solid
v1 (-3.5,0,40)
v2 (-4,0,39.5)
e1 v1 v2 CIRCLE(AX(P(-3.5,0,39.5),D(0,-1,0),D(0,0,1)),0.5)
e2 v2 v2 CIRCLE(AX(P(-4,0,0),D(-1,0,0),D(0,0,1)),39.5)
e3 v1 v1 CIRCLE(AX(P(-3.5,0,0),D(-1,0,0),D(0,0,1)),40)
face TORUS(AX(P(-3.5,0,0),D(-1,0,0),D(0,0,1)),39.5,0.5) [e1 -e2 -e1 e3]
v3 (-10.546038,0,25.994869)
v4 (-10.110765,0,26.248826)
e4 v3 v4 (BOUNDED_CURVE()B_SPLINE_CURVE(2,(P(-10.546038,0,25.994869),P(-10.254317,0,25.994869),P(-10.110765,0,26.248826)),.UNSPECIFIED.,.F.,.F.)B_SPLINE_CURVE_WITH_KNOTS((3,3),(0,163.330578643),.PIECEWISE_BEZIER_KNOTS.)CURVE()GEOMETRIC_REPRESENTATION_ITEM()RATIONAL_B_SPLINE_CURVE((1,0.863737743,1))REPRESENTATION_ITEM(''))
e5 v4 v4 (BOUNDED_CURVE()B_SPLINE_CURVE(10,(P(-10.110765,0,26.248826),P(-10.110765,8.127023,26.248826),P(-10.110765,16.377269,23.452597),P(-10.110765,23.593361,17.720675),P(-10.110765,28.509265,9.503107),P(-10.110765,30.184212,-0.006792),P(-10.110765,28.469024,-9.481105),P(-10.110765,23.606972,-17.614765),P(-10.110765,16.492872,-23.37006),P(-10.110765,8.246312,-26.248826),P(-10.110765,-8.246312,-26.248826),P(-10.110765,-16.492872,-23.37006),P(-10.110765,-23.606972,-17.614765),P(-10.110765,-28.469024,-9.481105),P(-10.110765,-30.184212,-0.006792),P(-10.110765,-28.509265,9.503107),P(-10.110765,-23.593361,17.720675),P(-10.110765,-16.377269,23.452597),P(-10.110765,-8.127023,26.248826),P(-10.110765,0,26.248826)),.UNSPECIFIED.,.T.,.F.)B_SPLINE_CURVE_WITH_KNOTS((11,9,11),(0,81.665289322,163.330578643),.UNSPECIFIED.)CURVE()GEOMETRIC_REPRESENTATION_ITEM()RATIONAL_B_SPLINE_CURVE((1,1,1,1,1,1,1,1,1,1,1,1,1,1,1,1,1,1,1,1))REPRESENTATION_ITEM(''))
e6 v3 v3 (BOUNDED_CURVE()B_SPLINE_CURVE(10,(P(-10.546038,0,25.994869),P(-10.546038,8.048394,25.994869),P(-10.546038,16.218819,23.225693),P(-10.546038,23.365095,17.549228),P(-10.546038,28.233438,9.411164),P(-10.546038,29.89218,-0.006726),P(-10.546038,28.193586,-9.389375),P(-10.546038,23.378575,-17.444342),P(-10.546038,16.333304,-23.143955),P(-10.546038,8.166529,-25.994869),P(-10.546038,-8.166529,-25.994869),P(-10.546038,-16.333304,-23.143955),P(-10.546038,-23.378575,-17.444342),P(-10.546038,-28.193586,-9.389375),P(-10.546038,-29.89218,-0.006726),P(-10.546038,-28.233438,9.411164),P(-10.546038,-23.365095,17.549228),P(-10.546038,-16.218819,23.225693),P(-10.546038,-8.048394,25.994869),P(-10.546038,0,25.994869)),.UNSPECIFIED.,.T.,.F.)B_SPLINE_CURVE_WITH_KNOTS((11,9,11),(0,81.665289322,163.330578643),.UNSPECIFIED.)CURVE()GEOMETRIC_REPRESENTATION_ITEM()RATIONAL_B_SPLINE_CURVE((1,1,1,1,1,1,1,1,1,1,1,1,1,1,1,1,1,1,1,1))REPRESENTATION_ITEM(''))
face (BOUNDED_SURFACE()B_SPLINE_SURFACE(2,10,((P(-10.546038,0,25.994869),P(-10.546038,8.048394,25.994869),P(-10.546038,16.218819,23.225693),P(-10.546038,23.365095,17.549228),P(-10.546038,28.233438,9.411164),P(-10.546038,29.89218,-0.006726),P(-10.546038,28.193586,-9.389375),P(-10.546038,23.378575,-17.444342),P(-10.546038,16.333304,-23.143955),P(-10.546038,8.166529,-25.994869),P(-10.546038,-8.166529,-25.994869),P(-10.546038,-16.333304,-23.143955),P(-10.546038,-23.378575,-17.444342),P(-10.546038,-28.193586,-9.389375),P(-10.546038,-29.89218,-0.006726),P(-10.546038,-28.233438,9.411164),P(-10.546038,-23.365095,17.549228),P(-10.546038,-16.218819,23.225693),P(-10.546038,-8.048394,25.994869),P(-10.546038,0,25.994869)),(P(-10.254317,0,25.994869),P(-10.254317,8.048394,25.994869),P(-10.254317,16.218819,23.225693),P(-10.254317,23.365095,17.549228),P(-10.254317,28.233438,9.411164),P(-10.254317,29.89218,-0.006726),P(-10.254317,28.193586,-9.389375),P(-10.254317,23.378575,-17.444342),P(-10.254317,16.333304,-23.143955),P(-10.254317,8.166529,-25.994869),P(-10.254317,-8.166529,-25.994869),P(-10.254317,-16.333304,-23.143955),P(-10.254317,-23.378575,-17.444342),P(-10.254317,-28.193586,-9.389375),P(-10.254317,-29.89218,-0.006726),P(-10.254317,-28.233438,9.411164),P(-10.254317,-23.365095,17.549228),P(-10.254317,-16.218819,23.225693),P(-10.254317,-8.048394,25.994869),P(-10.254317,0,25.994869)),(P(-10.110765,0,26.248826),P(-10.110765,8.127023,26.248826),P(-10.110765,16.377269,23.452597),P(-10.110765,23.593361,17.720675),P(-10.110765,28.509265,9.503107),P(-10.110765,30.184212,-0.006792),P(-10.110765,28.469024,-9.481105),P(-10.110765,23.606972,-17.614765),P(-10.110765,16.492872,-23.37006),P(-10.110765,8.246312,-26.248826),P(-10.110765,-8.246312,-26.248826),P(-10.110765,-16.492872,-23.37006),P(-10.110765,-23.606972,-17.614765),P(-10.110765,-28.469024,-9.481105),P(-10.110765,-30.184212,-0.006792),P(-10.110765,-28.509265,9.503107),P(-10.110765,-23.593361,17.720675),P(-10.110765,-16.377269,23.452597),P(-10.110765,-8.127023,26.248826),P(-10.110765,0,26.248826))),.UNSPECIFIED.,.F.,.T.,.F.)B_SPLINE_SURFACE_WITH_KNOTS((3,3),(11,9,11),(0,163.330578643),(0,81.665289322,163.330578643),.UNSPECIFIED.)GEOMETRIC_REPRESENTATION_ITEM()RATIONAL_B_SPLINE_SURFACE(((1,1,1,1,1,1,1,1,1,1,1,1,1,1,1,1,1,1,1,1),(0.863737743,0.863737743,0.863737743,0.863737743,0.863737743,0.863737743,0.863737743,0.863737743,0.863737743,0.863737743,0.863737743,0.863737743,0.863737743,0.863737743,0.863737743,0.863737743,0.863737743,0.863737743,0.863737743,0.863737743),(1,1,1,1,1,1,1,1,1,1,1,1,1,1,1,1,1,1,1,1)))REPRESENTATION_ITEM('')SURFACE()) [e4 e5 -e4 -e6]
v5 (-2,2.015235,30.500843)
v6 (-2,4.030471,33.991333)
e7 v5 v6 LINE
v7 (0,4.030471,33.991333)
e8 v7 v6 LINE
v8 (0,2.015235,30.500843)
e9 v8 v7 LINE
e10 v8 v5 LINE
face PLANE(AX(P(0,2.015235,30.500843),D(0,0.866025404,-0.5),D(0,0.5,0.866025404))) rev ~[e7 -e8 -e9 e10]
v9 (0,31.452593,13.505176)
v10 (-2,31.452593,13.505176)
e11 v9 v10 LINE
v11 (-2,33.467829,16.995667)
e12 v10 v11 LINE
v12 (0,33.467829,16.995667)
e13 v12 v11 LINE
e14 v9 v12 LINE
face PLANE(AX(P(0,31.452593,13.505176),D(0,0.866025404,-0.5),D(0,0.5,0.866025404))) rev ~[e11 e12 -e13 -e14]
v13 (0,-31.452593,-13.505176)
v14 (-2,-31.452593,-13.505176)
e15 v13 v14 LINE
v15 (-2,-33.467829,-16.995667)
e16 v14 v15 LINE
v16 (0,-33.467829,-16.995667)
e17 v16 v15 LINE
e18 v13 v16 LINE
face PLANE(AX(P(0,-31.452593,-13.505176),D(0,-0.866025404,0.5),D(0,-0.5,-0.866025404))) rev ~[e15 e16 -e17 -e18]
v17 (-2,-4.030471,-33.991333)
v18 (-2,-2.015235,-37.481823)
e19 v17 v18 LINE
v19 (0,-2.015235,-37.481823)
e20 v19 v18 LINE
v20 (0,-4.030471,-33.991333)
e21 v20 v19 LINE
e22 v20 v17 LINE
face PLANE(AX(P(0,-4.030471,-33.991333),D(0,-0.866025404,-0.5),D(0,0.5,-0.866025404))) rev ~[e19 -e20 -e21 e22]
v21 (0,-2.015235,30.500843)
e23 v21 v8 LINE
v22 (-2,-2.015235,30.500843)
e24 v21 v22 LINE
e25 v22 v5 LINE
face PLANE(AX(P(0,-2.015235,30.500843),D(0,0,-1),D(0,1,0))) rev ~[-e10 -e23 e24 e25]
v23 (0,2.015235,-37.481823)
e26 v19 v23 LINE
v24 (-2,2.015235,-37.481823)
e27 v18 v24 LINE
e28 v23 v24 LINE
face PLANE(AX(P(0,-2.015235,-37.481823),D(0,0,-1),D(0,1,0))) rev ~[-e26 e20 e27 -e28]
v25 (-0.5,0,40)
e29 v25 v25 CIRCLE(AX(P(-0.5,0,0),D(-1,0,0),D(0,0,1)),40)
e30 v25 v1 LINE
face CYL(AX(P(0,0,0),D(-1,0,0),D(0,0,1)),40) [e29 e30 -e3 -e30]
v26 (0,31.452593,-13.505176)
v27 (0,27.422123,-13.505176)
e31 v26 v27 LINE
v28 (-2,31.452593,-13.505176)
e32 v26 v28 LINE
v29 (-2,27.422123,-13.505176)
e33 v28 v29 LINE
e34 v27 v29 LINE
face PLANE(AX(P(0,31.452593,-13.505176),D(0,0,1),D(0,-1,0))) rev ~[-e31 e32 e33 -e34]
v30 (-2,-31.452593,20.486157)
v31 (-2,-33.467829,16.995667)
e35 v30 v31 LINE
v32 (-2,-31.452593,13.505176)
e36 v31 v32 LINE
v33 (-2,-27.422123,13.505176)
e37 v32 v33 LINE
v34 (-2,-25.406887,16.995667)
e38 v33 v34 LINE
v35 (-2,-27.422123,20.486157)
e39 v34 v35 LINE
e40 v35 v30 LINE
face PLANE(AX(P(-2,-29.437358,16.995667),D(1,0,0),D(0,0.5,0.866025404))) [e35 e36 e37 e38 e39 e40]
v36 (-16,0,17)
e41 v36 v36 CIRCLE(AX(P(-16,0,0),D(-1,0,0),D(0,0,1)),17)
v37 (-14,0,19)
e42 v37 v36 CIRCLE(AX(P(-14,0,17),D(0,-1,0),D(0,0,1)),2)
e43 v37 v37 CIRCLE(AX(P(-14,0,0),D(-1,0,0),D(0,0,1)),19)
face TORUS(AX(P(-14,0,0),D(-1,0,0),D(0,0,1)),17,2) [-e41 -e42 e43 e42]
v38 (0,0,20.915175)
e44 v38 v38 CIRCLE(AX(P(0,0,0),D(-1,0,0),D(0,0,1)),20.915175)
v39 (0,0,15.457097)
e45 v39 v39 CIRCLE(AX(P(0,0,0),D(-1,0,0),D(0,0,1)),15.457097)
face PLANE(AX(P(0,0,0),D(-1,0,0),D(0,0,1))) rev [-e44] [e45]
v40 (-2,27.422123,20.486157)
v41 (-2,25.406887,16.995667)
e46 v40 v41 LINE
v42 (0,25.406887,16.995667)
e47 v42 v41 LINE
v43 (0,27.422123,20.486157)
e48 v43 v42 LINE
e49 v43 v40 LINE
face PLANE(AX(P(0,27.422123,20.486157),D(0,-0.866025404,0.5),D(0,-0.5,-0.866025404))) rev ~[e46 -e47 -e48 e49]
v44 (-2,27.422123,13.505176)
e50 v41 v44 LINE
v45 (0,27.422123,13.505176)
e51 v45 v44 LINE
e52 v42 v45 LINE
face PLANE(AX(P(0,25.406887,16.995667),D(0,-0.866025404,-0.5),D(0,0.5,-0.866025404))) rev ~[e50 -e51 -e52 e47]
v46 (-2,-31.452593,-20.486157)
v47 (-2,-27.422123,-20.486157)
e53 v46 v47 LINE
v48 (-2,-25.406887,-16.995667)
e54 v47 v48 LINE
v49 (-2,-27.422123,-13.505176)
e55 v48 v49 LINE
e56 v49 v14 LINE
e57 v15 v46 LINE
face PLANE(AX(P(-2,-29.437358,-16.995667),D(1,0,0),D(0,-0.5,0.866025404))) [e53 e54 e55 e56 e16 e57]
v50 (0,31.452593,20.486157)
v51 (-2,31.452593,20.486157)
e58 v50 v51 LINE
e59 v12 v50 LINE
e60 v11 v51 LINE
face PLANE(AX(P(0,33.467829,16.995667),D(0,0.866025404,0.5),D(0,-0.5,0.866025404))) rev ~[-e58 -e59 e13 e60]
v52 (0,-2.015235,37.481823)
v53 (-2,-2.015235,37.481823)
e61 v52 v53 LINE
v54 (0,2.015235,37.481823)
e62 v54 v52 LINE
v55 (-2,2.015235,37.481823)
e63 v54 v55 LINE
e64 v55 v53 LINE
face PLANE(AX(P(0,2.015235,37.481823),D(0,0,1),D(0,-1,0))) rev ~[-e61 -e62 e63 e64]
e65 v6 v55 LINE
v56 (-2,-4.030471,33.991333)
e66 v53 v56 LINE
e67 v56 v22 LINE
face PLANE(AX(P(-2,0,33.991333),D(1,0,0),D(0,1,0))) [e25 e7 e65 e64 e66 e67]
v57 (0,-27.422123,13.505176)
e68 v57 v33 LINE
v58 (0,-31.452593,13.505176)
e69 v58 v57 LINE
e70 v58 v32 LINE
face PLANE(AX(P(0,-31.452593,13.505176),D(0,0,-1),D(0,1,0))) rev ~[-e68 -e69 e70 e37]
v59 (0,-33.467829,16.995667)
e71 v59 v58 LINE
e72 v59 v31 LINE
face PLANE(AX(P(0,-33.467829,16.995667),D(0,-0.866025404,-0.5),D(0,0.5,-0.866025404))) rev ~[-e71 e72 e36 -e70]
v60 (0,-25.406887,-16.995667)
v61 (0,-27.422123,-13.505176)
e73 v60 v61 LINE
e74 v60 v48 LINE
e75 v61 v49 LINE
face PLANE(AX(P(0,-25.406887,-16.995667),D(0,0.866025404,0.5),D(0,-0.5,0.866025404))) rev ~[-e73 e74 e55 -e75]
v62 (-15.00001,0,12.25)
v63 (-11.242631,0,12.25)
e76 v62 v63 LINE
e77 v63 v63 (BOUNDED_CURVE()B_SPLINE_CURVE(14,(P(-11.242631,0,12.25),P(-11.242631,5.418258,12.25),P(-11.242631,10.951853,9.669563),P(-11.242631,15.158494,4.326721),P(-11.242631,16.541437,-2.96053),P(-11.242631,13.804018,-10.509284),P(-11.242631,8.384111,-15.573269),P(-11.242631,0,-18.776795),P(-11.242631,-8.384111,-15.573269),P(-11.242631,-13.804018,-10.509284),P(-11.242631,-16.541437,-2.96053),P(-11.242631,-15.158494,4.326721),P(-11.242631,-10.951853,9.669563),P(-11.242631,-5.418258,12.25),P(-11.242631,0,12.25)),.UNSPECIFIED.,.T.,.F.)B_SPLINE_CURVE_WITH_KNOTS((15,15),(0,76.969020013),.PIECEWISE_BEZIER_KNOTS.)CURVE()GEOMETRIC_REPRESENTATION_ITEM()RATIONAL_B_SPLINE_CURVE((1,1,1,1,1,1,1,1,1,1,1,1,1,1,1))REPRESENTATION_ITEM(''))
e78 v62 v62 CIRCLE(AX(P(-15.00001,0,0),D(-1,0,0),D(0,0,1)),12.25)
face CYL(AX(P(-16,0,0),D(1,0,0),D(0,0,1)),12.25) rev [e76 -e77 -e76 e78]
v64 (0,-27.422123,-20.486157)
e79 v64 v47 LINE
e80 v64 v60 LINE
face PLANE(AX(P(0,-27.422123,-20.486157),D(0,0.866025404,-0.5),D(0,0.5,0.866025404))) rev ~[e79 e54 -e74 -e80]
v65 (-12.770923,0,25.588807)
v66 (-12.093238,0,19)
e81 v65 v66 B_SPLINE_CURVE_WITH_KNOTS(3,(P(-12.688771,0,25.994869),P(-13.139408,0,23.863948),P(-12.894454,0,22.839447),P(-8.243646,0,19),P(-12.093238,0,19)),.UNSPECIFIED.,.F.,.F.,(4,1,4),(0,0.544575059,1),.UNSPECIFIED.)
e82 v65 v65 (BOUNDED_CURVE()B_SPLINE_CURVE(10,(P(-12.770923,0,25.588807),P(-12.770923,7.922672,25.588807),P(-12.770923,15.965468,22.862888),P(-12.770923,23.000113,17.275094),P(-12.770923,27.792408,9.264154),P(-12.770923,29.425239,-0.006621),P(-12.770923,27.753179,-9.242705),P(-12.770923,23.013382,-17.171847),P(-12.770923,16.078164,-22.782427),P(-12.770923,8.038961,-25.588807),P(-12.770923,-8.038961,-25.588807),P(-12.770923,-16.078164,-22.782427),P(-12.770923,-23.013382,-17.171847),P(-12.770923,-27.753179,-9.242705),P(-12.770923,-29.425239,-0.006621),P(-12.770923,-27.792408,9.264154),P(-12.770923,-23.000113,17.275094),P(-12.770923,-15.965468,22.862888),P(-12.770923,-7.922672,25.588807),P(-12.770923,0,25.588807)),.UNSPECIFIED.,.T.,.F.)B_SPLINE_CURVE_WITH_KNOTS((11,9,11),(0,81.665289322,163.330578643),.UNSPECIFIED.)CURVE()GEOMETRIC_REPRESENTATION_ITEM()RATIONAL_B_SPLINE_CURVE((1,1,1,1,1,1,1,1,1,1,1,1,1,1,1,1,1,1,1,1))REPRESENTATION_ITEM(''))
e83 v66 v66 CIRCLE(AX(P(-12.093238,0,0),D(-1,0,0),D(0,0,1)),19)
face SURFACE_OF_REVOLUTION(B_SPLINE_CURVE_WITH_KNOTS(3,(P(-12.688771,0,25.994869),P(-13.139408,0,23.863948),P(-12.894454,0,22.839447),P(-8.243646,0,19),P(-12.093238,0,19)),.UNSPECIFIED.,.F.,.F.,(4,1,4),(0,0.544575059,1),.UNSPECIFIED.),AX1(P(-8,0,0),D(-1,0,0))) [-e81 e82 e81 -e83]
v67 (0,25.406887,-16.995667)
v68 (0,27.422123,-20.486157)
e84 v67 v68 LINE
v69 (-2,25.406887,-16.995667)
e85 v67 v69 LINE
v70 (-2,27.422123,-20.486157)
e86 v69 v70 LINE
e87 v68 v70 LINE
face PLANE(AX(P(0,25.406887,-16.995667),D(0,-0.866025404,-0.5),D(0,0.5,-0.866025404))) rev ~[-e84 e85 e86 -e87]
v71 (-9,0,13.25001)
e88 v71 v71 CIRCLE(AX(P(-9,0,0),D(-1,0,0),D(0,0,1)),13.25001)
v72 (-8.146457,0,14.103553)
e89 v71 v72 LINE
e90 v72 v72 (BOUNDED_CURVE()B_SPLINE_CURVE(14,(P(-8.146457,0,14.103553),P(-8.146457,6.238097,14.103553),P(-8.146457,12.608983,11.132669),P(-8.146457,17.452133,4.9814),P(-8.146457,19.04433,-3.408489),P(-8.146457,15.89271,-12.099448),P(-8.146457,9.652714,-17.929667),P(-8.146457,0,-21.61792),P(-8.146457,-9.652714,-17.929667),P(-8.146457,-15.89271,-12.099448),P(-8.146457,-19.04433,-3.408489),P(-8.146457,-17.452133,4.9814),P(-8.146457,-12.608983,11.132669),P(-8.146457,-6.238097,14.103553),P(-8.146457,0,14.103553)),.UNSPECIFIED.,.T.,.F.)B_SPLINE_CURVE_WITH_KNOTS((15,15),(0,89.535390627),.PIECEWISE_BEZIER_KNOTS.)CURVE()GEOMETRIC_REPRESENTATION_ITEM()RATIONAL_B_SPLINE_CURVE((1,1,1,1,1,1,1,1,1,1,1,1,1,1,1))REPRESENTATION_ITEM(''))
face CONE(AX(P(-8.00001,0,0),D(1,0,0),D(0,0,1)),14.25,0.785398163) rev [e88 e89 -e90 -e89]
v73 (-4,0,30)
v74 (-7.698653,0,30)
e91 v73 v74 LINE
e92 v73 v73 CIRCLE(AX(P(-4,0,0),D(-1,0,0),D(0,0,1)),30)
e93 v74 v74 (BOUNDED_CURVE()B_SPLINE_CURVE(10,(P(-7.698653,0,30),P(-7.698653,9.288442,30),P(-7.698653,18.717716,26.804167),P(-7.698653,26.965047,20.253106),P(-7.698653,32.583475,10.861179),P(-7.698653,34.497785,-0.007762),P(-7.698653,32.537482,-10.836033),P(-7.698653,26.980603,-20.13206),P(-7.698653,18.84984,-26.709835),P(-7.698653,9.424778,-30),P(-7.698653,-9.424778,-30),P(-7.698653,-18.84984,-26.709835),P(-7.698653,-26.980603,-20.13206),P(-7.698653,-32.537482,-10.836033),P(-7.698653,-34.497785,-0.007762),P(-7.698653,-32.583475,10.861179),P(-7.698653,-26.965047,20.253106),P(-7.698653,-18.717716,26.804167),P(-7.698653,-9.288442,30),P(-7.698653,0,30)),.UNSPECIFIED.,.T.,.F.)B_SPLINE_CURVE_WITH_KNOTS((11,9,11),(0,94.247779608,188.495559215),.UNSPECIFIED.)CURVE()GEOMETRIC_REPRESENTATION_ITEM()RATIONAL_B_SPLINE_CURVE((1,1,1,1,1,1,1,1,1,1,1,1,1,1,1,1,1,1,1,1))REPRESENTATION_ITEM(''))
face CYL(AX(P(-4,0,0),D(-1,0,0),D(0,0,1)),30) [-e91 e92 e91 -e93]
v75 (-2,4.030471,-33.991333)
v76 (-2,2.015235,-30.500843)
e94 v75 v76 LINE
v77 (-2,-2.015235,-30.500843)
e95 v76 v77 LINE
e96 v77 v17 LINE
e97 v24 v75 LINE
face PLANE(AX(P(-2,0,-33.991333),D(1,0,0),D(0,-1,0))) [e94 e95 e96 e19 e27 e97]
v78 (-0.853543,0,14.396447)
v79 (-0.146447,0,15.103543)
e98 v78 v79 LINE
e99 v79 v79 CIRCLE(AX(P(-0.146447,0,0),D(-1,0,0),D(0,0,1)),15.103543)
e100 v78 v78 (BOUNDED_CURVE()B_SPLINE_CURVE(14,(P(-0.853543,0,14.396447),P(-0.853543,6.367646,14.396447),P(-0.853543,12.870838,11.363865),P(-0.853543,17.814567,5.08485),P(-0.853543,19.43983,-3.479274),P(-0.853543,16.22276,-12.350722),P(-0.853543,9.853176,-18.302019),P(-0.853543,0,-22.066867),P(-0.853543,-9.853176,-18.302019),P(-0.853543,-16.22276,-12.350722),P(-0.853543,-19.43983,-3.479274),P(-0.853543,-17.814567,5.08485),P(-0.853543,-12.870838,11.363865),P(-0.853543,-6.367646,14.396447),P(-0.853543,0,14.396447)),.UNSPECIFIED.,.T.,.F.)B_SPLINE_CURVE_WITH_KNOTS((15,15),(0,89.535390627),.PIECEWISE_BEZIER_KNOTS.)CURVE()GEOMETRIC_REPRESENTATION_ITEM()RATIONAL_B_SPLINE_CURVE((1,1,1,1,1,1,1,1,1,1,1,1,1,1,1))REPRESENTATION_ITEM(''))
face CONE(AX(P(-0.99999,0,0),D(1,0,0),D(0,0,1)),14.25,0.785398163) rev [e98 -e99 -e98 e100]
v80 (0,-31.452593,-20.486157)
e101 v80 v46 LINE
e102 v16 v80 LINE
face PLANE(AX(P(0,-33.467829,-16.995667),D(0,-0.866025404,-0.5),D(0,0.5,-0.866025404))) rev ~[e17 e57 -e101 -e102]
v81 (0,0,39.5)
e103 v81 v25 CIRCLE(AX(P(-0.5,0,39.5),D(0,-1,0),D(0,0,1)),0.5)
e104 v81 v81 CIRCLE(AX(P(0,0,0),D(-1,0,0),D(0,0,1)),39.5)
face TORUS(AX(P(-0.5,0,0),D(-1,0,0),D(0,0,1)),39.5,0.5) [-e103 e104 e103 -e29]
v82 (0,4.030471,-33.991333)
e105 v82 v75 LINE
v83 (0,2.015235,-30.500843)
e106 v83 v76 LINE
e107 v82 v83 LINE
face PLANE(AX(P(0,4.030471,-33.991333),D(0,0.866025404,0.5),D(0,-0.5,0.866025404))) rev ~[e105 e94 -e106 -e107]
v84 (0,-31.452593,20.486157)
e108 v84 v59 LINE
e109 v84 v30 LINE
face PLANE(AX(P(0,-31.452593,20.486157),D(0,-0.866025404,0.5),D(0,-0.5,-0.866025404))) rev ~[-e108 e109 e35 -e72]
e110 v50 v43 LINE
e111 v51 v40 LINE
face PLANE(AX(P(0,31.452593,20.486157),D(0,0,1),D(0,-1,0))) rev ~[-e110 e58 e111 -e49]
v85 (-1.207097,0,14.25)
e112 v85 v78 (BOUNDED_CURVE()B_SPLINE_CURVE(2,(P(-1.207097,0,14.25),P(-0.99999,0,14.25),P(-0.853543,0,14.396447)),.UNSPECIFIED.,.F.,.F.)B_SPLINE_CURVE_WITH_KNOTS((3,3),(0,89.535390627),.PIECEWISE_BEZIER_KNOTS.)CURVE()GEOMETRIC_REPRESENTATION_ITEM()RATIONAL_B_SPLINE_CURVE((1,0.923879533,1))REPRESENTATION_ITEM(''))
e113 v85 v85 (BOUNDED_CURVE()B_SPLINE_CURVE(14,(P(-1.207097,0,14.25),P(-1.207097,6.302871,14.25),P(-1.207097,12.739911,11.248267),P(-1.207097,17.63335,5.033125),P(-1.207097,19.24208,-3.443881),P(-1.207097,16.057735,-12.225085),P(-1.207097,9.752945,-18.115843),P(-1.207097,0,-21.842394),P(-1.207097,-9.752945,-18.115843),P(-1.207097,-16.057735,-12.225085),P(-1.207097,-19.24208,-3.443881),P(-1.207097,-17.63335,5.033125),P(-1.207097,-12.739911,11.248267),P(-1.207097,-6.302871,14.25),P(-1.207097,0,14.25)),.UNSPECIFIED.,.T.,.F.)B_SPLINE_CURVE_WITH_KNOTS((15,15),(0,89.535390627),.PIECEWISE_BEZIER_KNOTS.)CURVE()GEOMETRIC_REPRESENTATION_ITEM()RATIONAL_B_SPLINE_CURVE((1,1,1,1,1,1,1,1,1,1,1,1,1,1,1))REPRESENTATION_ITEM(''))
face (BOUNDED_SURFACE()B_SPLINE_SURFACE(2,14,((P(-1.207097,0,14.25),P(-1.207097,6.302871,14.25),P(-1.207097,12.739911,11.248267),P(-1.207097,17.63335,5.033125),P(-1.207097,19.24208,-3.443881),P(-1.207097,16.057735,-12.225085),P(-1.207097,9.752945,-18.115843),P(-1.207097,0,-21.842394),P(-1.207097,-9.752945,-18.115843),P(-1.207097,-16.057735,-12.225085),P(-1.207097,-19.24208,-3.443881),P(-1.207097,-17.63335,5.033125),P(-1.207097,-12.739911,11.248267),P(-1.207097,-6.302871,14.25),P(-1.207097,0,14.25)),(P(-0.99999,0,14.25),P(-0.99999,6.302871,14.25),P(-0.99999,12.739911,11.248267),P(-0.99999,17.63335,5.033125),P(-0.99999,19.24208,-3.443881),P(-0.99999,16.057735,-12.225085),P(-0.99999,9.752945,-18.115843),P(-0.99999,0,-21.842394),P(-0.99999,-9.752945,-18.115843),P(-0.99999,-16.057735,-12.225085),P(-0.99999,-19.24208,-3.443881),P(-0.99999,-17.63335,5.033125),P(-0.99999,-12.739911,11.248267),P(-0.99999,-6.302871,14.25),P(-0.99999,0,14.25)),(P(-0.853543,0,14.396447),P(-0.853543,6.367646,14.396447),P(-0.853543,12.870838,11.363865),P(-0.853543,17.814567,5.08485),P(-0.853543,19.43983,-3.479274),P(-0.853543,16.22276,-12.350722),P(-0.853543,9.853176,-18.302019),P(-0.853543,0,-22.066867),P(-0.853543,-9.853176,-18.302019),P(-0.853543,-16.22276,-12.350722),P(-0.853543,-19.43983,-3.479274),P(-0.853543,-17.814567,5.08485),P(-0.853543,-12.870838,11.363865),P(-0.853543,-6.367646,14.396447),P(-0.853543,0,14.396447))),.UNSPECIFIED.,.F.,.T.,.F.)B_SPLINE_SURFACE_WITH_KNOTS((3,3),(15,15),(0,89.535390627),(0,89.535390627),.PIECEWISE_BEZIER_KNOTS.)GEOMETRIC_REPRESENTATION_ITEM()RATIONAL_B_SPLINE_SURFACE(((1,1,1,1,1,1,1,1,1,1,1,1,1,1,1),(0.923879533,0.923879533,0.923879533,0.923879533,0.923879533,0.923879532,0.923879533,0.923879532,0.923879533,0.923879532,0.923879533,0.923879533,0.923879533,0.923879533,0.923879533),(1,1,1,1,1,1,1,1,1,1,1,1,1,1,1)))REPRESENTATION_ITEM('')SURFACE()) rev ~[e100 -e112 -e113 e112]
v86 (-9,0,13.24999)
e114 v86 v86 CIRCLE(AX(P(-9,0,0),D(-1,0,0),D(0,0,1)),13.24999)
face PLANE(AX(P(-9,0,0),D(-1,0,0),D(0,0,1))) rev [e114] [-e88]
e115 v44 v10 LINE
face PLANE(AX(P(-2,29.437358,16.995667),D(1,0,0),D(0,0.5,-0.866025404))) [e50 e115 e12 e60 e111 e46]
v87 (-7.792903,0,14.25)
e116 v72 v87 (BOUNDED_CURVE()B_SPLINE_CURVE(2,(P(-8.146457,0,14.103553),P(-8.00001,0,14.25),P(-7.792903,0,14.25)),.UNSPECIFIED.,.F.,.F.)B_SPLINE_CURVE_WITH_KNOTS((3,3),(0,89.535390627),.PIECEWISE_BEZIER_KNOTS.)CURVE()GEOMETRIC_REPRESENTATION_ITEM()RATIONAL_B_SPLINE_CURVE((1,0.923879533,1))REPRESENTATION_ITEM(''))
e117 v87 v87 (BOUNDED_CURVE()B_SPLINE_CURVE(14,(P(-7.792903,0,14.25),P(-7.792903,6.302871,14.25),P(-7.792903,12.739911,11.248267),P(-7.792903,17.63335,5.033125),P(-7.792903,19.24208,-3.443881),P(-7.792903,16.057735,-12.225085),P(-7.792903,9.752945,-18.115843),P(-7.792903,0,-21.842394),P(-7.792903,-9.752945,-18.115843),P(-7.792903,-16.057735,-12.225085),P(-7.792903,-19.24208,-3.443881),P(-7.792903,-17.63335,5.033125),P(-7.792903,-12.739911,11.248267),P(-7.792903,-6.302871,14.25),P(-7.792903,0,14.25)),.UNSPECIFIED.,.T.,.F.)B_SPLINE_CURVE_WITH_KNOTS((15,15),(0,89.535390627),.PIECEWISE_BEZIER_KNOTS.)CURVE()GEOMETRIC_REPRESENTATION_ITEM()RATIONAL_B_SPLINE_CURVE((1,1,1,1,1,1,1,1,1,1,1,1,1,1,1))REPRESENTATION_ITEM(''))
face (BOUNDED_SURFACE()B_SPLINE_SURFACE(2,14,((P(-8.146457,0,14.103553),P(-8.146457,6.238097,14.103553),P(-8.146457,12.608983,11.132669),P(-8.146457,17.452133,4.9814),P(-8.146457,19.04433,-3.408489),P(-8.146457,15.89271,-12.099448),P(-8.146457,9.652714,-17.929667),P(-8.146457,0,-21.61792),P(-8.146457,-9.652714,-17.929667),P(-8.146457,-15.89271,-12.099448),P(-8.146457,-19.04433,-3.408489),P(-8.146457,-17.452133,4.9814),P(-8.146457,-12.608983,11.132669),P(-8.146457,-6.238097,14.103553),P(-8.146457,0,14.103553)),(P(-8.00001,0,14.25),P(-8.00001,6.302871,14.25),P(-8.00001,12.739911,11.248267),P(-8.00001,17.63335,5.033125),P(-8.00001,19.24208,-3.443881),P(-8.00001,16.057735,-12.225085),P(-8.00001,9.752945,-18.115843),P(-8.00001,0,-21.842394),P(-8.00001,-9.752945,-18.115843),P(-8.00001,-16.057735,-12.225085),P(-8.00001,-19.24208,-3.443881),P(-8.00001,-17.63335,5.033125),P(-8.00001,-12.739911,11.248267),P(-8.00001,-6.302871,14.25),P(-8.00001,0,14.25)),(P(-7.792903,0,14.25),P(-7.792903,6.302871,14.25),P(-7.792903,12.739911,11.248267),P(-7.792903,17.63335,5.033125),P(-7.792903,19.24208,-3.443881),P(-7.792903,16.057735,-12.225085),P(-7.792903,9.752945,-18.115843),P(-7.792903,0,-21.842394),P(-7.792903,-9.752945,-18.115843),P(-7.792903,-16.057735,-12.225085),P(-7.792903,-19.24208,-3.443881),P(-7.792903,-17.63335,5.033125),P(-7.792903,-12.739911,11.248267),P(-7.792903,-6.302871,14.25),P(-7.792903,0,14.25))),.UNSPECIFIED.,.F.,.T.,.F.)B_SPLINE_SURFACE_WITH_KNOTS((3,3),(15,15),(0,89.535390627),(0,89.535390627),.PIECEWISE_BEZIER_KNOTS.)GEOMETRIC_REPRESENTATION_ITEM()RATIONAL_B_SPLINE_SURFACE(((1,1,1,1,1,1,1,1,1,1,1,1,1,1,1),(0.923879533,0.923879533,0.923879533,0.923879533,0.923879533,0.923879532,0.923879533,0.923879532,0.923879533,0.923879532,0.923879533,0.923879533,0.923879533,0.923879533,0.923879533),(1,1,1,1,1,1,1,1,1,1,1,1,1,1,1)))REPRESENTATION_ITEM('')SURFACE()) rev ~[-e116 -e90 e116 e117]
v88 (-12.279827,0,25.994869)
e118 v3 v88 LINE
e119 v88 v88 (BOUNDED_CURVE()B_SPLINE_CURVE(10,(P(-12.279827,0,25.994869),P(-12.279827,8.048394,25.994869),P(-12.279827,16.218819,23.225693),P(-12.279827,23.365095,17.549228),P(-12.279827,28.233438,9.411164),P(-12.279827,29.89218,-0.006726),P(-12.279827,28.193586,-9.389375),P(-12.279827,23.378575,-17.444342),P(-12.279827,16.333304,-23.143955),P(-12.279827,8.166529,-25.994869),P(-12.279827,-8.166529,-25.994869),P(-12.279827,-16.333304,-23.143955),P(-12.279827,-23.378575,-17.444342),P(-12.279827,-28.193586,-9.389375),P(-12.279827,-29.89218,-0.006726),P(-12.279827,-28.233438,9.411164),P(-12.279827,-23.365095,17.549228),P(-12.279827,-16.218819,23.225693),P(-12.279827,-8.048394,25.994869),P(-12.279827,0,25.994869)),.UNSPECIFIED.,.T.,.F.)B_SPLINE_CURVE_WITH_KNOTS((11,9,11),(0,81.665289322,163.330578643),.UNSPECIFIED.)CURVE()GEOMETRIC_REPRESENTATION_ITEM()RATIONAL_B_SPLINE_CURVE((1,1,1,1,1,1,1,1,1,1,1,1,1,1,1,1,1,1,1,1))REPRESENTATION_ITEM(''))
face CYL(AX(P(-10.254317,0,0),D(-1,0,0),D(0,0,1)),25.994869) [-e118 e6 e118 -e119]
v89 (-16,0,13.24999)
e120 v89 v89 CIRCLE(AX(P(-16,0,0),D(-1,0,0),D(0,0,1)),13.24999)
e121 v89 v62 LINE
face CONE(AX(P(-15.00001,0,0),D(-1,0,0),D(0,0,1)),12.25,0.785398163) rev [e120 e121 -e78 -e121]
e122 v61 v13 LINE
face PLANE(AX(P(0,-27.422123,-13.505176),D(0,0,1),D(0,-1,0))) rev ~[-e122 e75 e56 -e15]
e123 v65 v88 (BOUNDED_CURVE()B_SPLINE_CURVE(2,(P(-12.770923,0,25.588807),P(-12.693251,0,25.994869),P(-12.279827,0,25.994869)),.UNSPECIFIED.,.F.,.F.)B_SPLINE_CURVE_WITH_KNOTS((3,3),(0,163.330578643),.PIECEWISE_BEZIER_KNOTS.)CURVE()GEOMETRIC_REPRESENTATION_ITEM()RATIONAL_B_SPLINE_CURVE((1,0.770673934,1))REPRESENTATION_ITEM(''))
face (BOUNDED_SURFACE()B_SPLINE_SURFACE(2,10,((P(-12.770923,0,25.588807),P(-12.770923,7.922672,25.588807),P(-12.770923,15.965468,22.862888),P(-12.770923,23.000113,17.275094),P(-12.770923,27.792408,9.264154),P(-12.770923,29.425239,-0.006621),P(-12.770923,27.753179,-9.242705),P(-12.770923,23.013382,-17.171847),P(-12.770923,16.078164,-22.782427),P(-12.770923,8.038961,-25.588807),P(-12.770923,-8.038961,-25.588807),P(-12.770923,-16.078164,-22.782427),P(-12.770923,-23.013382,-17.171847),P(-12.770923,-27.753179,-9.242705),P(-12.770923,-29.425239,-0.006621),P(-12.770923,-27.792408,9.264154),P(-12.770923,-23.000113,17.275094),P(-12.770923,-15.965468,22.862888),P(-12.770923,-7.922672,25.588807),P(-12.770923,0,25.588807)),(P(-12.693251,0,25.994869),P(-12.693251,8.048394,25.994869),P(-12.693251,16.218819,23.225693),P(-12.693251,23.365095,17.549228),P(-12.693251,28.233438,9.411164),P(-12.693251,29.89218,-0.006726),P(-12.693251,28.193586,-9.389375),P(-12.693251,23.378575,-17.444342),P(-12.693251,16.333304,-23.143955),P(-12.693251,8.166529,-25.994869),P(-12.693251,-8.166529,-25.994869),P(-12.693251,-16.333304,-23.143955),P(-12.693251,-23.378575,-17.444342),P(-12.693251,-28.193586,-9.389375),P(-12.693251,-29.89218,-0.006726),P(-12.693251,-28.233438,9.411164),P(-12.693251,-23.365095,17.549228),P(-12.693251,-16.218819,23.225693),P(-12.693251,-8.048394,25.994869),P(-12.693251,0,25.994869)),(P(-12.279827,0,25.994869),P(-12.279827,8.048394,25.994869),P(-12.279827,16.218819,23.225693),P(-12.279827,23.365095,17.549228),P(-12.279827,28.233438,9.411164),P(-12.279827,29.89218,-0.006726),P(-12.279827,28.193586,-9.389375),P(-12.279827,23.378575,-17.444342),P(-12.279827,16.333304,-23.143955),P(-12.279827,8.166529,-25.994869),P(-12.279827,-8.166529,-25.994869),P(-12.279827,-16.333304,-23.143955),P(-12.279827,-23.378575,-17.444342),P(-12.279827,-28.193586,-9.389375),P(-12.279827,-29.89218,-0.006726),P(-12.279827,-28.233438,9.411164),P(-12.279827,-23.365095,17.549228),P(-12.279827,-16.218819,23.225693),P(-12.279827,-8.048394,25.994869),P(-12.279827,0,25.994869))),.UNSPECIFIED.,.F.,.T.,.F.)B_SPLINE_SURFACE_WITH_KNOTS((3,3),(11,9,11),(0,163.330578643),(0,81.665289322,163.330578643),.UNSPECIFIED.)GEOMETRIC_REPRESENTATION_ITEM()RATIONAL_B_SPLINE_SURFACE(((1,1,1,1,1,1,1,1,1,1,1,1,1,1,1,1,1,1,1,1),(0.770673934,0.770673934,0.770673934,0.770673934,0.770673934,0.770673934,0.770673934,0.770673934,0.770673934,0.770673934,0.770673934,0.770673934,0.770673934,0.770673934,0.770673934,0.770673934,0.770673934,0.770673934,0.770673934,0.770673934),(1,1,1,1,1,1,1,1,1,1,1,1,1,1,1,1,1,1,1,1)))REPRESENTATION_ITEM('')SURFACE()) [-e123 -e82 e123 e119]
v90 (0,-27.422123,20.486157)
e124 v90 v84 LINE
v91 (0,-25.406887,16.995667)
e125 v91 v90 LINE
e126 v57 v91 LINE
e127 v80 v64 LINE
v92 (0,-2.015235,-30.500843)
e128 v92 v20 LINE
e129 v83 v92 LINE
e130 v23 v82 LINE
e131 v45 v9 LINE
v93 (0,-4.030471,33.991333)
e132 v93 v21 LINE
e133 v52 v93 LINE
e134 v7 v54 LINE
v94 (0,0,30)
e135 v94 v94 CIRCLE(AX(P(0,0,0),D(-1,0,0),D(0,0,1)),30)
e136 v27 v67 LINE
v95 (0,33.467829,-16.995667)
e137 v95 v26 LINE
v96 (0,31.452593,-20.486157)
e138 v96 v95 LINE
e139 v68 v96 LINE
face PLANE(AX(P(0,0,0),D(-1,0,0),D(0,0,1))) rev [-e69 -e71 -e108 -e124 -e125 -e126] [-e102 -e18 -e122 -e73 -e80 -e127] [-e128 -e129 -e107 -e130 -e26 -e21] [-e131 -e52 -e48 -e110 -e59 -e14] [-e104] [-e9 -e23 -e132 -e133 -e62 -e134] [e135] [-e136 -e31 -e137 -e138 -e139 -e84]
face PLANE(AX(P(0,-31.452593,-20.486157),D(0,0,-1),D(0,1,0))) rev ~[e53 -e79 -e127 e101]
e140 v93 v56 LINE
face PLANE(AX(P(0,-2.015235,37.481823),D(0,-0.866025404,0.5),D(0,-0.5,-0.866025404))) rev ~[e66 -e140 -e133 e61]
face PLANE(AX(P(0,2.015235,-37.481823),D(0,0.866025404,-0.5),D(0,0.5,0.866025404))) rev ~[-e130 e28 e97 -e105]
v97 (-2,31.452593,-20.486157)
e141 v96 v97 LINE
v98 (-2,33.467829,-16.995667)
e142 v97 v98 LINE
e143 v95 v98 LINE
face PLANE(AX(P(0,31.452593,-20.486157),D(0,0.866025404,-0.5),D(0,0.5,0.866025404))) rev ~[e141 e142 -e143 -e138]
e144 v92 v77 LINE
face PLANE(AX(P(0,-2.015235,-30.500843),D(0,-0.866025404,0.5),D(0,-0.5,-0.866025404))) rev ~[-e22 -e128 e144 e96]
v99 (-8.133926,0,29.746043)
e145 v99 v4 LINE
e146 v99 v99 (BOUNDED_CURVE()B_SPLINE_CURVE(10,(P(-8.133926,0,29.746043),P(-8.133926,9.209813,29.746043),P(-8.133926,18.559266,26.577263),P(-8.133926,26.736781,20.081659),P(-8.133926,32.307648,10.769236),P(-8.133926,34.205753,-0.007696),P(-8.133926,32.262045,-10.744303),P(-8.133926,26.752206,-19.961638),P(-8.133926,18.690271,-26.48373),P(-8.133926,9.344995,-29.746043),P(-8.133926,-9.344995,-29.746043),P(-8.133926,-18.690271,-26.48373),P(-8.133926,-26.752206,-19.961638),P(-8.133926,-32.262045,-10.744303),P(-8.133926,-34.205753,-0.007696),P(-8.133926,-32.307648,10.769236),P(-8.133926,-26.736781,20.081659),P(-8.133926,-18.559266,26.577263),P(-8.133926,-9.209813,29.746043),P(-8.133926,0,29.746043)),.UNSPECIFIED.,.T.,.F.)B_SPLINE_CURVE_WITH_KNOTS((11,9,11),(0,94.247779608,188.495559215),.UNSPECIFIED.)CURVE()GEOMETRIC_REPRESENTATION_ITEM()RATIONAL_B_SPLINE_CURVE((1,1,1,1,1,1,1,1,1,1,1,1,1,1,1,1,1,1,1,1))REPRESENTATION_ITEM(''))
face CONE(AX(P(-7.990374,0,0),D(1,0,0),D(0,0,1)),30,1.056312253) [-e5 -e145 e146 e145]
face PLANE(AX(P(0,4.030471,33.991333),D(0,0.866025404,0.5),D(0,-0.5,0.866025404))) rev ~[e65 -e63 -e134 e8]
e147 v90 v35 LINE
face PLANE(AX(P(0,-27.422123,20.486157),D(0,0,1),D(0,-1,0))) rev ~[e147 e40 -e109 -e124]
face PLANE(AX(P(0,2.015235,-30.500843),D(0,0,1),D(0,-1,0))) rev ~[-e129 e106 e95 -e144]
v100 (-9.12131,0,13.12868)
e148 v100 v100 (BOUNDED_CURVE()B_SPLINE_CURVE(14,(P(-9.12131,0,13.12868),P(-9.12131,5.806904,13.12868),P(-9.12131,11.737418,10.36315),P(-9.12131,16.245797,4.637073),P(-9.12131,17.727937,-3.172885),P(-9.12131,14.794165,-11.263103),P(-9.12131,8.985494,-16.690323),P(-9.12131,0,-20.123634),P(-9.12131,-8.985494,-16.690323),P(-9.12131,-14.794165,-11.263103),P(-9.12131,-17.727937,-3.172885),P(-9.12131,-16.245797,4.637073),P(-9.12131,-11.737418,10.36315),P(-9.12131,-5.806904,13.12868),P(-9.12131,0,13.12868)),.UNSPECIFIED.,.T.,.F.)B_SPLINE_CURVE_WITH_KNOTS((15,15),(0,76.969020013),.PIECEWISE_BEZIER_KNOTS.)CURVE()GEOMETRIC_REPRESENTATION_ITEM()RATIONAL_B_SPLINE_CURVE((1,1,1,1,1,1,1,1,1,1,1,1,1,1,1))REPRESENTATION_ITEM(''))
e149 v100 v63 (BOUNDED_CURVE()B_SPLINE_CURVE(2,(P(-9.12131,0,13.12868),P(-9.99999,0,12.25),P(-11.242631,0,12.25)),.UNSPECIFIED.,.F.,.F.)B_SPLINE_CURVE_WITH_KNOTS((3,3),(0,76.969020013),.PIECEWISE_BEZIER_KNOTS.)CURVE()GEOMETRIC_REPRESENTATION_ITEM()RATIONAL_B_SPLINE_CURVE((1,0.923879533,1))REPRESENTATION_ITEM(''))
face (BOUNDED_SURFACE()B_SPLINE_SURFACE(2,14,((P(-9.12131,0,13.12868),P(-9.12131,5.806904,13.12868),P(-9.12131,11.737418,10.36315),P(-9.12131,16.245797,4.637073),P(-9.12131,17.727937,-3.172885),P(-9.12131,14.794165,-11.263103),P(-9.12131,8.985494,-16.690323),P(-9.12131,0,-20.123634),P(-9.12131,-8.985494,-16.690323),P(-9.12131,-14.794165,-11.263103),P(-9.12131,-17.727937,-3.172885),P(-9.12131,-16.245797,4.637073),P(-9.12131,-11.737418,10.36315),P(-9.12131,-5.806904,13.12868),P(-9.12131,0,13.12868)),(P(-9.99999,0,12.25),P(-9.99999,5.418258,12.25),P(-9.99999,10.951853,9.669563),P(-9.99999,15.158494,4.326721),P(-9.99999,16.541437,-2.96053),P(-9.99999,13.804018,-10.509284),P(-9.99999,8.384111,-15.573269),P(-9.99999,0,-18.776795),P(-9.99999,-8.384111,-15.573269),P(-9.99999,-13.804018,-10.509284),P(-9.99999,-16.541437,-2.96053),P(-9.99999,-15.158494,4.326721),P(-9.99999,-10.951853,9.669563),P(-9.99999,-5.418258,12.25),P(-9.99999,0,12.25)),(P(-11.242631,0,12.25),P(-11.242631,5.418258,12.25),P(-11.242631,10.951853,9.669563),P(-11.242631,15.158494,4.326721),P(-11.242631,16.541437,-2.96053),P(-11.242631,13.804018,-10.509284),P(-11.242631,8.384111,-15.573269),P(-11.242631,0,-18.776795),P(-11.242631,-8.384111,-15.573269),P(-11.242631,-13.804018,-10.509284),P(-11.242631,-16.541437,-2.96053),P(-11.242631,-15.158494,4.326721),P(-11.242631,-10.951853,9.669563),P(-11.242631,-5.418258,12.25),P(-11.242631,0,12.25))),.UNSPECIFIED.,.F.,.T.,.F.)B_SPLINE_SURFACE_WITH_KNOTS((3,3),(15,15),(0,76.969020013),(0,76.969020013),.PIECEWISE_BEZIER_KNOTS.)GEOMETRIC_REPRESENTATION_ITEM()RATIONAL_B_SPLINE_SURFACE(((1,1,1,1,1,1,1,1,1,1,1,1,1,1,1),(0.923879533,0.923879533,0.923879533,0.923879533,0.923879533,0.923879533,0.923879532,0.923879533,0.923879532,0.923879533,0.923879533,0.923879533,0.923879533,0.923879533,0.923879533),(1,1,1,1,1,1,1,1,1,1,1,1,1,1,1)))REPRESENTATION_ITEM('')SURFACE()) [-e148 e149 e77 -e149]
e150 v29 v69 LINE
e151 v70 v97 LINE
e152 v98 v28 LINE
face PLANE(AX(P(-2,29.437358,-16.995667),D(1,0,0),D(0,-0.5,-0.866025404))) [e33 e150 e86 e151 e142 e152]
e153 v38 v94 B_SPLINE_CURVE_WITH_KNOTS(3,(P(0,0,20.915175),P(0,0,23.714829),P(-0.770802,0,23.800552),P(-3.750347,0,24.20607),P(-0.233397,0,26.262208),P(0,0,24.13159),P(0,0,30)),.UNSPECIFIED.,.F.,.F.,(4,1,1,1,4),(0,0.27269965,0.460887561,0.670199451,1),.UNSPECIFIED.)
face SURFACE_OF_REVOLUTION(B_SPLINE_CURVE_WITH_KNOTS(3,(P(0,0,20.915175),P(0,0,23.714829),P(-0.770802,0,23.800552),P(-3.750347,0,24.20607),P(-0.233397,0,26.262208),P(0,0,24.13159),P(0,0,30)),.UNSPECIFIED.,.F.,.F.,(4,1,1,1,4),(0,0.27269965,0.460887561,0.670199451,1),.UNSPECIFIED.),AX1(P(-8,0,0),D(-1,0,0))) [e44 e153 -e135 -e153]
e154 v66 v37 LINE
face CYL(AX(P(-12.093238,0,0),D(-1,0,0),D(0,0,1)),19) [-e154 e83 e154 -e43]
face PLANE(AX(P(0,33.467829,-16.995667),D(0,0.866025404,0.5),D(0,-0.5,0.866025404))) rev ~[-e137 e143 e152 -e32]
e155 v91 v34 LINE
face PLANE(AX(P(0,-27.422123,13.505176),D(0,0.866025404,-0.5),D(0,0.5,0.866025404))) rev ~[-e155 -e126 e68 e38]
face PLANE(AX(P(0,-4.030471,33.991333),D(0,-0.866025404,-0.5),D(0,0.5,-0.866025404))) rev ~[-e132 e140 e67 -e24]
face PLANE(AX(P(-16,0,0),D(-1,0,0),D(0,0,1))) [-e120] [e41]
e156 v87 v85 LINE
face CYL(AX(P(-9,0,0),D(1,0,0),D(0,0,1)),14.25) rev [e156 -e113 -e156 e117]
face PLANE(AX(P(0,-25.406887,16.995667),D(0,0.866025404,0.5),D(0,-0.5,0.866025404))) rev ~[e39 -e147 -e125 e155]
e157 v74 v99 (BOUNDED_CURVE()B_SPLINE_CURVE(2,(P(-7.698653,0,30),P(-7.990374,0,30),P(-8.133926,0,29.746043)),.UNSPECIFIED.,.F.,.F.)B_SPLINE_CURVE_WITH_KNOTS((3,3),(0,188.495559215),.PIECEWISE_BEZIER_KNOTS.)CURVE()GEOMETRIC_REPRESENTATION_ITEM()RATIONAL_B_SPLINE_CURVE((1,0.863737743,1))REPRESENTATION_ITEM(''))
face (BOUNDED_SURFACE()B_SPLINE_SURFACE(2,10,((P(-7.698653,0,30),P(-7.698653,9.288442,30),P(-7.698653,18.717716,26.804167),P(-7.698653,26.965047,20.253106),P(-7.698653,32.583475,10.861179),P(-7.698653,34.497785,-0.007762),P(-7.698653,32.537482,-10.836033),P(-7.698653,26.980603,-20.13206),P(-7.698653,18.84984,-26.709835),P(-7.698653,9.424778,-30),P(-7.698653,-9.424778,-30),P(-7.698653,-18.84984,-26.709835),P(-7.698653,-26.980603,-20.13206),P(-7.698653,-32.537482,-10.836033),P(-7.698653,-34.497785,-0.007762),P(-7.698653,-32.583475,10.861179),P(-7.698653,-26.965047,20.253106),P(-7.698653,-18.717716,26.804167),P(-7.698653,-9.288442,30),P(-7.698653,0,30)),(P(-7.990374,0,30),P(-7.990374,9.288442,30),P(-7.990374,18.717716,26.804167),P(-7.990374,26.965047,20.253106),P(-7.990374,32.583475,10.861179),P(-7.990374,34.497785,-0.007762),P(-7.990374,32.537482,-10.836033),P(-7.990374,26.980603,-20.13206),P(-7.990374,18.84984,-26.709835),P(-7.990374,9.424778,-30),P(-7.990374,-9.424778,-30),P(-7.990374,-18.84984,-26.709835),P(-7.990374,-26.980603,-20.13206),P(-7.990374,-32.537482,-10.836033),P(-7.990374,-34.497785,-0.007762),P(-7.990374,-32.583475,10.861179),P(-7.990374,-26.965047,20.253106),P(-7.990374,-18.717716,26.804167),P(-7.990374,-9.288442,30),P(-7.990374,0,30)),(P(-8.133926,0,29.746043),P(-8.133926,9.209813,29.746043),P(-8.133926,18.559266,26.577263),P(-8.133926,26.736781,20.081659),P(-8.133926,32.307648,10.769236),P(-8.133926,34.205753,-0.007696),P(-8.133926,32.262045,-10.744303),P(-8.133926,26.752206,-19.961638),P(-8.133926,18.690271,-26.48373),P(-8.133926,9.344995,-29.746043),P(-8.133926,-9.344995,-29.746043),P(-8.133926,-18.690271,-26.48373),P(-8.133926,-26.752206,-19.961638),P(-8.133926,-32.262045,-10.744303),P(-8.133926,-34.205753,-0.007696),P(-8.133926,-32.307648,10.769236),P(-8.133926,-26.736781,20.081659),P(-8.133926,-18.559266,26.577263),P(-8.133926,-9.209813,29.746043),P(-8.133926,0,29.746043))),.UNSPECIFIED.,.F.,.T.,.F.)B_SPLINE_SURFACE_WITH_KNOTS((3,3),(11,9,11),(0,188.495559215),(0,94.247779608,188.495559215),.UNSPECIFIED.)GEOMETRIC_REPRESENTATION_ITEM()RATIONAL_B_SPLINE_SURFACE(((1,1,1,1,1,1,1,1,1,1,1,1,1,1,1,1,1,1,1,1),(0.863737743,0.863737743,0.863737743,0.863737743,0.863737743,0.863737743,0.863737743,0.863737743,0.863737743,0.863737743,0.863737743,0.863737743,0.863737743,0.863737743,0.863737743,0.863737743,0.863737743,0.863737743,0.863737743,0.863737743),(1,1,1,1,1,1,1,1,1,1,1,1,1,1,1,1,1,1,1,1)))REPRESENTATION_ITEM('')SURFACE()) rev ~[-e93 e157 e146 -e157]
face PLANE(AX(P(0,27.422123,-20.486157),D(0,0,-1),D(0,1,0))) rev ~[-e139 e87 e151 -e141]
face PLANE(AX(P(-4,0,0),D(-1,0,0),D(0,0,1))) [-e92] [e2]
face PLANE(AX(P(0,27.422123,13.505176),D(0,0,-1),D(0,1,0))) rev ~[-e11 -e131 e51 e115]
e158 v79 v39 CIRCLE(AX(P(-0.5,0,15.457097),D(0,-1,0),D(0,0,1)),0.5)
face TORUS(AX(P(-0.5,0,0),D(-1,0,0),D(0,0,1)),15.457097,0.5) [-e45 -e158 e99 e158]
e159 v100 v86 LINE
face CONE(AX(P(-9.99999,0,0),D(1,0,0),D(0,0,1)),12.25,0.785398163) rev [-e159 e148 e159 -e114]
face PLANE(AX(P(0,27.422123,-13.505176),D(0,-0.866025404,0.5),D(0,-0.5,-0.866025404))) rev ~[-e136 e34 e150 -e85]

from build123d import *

# Parameters (mm, degrees)
F2_R            = 2
F3_SIZE         = 0.99999
F4_R            = 0.5
F6_R            = 0.5
F9_DEPTH        = 2
F9_COPIES_COUNT = 6
F10_R           = 3


# Not quite as in the source:
# - two fillets or chamfers of one size are made in one step
# - a fillet or chamfer is up to 0.001 mm smaller than in the source, because OpenCascade refuses the exact size
# - a feature of the source that left no trace in its solid (it failed there, or was rolled back) is left out
# - a pattern or mirror of a feature is missing from the dataset's text; its kind, count and spacing are read off the source's solid
# - a feature names something its author has since deleted; it is built from what else it names


with BuildPart() as f1:
    # F0 (on Front) → F1 (revolve)
    with BuildSketch(Plane.XZ):
        with BuildLine():
            Line((-9, 14.25), (0, 14.25))
            Line((0, 14.25), (0, 20.9151750591))
            add(Edge.make_bspline(
                [(0, 20.9151750591), (0, 23.7148292074), (-0.770801608, 23.800552067), (-3.7503474156, 24.206069558), (-0.2333968766, 26.2622078851), (0, 24.1315897015), (0, 30)],
                knots=[0, 0, 0, 0, 0.2726996503, 0.4608875605, 0.6701994511, 1, 1, 1, 1], degree=3))
            Line((0, 30), (0, 40))
            Line((0, 40), (-4, 40))
            Line((-4, 40), (-4, 30))
            Line((-4, 30), (-7.9903741074, 30))
            Line((-7.9903741074, 30), (-10.2543169633, 25.9948689491))
            Line((-10.2543169633, 25.9948689491), (-12.6887708822, 25.9948689491))
            add(Edge.make_bspline(
                [(-12.6887708822, 25.9948689491), (-13.1394076011, 23.8639483866), (-12.8944542608, 22.8394469196), (-8.2436457926, 19), (-12.0932381461, 19)],
                knots=[0, 0, 0, 0, 0.5445750587, 1, 1, 1, 1], degree=3))
            Line((-12.0932381461, 19), (-16, 19))
            Line((-16, 19), (-16, 12.25))
            Line((-16, 12.25), (-9, 12.25))
            Line((-9, 12.25), (-9, 14.25))
        make_face()
    revolve(axis=Axis((-8, 0, 0), (-1, 0, 0)))

    # F2
    f2_edges = [f1.edges().sort_by_distance(p)[0] for p in [
        (-16, 0, -19),
    ]]
    fillet(f2_edges, radius=F2_R)

    # F3 (size 1 in the source; OpenCascade refuses exactly that, so slightly less here)
    f3_edges = [f1.edges().sort_by_distance(p)[0] for p in [
        (-16, 0, -12.25),
        (-9, 0, -12.25),
        (-9, 0, -14.25),
        (0, 0, -14.25),
    ]]
    chamfer(f3_edges, length=F3_SIZE)

    # F4
    f4_edges = [f1.edges().sort_by_distance(p)[0] for p in [
        (-8.00001, 0, -14.25),
    ]]
    fillet(f4_edges, radius=F4_R)

    # F6
    f6_edges = [f1.edges().sort_by_distance(p)[0] for p in [
        (-0.99999, 0, -14.25),
        (0, 0, -15.24999),
        (0, 0, -40),
        (-4, 0, -40),
        (-12.688771, 0, -25.994869),
        (-7.990374, 0, -30),
        (-10.254317, 0, -25.994869),
    ]]
    fillet(f6_edges, radius=F6_R)

    # F8 (on face) → F9 (cut)
    with BuildSketch(Plane.YZ):
        Polygon((-2.0152354679, 37.4818233168), (-4.0304709358, 33.9913330972), (-2.0152354679, 30.5008428776), (2.0152354679, 30.5008428776), (4.0304709358, 33.9913330972), (2.0152354679, 37.4818233168), align=None)
    f9 = extrude(amount=-F9_DEPTH, mode=Mode.SUBTRACT)

    # F9_copies: F9 ×6 about axis
    f9_copies_axis = Axis((0, 0, 0), (1, 0, 0))
    for i in range(1, F9_COPIES_COUNT):
        add(f9.rotate(f9_copies_axis, i * 360 / F9_COPIES_COUNT), mode=Mode.SUBTRACT)

    # F10
    f10_edges = [f1.edges().sort_by_distance(p)[0] for p in [
        (-9.99999, 0, -12.25),
    ]]
    fillet(f10_edges, radius=F10_R)


solid = f1.part
